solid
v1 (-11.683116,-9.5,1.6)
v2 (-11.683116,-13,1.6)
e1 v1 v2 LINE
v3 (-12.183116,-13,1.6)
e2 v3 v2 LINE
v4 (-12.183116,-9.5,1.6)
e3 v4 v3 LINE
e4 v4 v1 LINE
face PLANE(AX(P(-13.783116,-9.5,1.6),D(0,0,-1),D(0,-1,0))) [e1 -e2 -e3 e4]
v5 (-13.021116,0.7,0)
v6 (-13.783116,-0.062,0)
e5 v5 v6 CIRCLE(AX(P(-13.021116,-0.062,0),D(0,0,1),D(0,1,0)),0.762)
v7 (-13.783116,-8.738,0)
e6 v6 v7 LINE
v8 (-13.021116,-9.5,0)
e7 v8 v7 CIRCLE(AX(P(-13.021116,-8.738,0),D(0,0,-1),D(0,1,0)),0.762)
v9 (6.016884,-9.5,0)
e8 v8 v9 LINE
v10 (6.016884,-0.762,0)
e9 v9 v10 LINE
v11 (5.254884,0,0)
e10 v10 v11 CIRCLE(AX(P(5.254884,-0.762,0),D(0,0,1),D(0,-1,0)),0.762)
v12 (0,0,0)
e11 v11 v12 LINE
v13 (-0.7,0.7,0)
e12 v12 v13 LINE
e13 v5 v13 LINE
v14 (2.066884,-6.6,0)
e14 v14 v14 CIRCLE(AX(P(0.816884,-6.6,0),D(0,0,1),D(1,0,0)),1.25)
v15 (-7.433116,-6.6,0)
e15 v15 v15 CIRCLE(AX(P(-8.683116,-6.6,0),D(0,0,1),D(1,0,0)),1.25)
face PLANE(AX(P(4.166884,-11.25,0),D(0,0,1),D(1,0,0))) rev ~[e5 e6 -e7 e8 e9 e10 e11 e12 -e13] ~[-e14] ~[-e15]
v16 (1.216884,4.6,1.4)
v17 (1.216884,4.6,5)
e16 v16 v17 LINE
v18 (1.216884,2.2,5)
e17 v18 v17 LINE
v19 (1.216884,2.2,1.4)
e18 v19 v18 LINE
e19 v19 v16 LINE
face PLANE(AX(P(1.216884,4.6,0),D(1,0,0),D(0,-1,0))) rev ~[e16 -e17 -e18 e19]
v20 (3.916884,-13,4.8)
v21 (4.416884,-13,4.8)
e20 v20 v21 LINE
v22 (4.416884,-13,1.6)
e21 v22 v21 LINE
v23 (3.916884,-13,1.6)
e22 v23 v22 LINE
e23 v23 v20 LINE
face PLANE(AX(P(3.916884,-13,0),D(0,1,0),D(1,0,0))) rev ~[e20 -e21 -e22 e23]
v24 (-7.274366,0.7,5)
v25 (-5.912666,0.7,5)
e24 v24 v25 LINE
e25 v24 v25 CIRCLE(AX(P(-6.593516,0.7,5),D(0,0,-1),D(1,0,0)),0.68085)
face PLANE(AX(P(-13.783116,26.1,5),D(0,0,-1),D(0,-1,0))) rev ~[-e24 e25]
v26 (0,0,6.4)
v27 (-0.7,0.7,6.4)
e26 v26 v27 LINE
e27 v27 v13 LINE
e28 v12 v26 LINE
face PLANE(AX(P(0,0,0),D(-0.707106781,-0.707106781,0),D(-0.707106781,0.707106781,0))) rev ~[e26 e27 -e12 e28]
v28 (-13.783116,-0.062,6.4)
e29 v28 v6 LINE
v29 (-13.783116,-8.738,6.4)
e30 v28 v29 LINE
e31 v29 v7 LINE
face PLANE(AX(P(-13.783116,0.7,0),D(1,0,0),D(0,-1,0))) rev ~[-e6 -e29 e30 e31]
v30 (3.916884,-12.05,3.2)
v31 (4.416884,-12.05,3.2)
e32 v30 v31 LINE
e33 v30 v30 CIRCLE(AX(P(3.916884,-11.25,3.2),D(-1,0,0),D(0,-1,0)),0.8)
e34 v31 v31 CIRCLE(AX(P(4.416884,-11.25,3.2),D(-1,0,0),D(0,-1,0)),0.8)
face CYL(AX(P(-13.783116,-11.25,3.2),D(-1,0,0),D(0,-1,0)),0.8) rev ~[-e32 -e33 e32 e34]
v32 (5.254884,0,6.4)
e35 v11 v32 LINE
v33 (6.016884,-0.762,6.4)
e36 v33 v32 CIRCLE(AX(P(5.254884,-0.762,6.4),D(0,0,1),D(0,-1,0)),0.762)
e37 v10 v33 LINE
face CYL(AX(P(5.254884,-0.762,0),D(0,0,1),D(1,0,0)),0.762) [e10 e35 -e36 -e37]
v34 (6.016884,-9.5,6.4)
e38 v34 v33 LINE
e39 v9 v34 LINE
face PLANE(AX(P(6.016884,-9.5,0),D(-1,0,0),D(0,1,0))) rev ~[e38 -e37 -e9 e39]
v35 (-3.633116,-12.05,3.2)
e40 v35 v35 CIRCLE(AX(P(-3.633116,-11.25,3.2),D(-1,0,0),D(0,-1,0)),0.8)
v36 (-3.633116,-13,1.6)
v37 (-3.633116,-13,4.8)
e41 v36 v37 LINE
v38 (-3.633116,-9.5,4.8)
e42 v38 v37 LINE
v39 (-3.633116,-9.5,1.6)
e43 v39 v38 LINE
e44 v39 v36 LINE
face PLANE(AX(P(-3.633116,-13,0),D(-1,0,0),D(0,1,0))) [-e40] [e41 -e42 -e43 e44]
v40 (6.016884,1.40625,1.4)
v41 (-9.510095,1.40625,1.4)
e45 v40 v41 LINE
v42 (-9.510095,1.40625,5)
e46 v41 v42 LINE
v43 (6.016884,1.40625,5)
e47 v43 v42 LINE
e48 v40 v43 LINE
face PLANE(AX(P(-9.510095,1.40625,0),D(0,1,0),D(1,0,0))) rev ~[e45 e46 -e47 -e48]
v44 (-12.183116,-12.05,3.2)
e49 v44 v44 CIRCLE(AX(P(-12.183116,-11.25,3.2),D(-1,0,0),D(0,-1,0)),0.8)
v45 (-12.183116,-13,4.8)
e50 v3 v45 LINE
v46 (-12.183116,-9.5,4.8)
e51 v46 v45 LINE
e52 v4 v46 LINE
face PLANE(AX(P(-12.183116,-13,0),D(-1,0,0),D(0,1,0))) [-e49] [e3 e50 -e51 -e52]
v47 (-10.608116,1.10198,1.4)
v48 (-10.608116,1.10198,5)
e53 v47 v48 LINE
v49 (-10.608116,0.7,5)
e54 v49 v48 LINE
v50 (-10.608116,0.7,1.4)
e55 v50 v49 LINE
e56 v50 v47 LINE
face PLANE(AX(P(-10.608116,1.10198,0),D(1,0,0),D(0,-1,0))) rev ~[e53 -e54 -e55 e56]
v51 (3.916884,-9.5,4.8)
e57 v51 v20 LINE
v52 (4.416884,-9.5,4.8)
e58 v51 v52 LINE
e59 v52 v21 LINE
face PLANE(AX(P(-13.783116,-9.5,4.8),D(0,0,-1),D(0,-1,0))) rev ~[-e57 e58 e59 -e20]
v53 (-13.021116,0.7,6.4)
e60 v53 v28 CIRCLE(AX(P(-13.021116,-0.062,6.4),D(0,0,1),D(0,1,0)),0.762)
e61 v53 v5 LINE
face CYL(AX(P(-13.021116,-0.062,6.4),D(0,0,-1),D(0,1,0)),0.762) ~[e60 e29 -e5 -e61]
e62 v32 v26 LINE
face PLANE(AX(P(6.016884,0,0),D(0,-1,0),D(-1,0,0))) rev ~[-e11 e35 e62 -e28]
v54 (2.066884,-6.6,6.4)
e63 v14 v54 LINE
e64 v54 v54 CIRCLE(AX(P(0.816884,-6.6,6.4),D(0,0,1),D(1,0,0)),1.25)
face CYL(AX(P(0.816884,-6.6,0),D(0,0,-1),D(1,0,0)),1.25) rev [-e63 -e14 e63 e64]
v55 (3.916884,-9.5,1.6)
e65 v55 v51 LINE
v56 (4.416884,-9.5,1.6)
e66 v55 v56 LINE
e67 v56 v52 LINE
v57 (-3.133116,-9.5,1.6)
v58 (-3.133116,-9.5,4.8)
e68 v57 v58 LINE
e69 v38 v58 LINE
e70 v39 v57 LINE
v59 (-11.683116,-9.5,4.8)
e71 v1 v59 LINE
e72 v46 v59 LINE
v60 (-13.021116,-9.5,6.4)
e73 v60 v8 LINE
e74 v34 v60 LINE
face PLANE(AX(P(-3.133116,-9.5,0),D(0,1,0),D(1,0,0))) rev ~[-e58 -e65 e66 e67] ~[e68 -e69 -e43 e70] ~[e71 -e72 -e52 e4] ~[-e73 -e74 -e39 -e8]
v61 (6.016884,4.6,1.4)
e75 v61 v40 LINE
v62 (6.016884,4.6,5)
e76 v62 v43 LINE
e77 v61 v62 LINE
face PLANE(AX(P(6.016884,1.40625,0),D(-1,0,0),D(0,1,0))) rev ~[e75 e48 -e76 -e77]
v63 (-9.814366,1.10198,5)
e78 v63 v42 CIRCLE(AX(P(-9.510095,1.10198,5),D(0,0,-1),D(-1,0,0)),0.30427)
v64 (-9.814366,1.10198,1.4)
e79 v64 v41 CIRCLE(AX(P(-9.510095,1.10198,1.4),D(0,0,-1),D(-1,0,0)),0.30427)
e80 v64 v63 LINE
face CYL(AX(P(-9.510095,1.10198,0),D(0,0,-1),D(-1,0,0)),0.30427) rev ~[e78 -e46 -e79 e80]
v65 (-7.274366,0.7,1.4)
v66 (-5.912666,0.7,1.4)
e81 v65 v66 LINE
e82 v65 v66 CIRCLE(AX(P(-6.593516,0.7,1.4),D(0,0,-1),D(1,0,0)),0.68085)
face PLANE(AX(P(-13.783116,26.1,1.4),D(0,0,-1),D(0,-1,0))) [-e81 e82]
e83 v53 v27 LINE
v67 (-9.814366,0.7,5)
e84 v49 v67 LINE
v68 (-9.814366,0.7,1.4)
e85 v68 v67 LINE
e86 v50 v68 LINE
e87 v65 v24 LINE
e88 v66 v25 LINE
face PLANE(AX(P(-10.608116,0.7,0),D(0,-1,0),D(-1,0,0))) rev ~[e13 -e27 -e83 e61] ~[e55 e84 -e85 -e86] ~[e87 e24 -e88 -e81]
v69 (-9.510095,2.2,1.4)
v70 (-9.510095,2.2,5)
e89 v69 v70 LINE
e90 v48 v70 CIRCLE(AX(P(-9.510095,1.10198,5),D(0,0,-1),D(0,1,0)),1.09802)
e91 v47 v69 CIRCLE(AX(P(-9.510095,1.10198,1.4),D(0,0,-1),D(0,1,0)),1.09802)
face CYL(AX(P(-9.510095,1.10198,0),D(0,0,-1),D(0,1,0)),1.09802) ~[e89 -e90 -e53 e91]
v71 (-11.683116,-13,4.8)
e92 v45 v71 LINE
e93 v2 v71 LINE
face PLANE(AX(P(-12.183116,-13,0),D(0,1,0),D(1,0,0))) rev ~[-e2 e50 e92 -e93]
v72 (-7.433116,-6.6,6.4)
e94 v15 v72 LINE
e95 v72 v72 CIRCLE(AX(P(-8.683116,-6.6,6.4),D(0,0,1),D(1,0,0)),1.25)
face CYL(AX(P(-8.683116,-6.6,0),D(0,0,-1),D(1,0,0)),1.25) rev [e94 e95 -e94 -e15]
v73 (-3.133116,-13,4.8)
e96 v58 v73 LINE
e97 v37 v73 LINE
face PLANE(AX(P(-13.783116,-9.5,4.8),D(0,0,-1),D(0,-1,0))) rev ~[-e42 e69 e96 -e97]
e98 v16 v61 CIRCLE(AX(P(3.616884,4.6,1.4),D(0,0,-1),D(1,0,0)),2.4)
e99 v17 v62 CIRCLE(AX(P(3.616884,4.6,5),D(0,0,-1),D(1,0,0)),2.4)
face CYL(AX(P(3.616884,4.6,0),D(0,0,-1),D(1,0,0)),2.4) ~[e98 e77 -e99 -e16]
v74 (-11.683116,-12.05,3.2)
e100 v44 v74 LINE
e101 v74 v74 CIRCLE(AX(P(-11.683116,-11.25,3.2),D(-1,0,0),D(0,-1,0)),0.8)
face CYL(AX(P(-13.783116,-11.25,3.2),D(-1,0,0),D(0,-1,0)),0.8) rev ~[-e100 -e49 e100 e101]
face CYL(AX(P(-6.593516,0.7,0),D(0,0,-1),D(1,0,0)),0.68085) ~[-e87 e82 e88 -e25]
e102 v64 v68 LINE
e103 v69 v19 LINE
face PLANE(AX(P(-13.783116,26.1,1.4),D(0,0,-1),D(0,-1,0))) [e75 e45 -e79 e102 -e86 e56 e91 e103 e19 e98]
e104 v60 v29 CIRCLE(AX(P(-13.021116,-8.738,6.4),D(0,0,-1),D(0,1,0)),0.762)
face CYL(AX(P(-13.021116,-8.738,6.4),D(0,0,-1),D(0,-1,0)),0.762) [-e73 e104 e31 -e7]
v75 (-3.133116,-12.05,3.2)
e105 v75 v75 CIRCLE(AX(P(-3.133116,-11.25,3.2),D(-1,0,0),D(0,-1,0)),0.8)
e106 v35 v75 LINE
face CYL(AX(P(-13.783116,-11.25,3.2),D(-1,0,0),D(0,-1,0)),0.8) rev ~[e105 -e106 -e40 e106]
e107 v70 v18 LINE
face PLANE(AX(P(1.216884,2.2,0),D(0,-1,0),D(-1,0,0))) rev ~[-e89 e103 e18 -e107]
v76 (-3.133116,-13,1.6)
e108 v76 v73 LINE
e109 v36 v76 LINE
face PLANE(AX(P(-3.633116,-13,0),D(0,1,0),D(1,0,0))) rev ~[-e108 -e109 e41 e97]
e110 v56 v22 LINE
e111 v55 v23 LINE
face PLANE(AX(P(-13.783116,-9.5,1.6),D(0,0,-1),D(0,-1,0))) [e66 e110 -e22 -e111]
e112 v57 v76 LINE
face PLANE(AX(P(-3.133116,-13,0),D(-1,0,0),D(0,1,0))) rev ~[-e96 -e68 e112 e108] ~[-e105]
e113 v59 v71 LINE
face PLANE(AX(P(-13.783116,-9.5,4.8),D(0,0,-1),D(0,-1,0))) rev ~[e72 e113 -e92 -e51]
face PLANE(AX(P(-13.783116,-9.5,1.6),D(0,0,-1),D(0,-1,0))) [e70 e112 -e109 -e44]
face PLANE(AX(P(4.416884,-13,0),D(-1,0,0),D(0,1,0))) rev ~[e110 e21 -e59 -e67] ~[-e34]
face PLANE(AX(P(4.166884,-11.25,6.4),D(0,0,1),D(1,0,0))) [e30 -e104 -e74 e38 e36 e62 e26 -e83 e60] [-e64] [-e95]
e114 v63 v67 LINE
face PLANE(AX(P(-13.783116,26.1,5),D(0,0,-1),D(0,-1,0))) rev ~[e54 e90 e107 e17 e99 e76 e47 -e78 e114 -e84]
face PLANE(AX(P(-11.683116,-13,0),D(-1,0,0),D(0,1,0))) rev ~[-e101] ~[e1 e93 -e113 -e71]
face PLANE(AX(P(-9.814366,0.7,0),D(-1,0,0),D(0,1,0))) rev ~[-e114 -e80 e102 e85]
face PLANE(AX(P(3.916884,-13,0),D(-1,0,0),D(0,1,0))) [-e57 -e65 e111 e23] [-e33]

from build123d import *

# Parameters (mm, degrees)
F0_W     = 0.5
F0_H     = 3.5
F0_R     = 1.25
F1_DEPTH = 6.4
F2_W     = 25.4
F2_H     = 1.4
F2_W_2   = 3.5
F2_H_2   = 1.6
F2_R     = 0.8
F3_DEPTH = 19.8
F4_R     = 0.762


with BuildPart() as f1:
    # F0 (on Top) → F1 (new body)
    with BuildSketch(Plane.XY):
        with Locations((4.1668843009, -11.25)):
            Rectangle(F0_W, F0_H)
        with Locations((-3.3831156991, -11.25)):
            Rectangle(F0_W, F0_H)
        with Locations((-11.9331156991, -11.25)):
            Rectangle(F0_W, F0_H)
        with BuildLine():
            Line((-10.6081156991, 0.7), (-9.8143656991, 0.7))
            Line((-9.8143656991, 0.7), (-9.8143656991, 1.101979753))
            ThreePointArc((-9.8143656991, 1.101979753), (-9.7252470071, 1.317131308), (-9.5100954521, 1.40625))
            Line((-9.5100954521, 1.40625), (6.0168843009, 1.40625))
            Line((6.0168843009, 1.40625), (6.0168843009, 2.2))
            Line((6.0168843009, 2.2), (6.0168843009, 4.6))
            ThreePointArc((6.0168843009, 4.6), (3.6168843009, 7), (1.2168843009, 4.6))
            Line((1.2168843009, 4.6), (1.2168843009, 2.2))
            Line((1.2168843009, 2.2), (-9.5100954521, 2.2))
            ThreePointArc((-9.5100954521, 2.2), (-10.2865130147, 1.8783973155), (-10.6081156991, 1.101979753))
            Line((-10.6081156991, 1.101979753), (-10.6081156991, 0.7))
        make_face()
        with BuildLine():
            Line((6.0168843009, 0), (0, 0))
            Line((0, 0), (-0.7, 0.7))
            Line((-0.7, 0.7), (-5.9126656991, 0.7))
            ThreePointArc((-5.9126656991, 0.7), (-6.5935156991, 1.38085), (-7.2743656991, 0.7))
            Line((-7.2743656991, 0.7), (-9.8143656991, 0.7))
            Line((-9.8143656991, 0.7), (-10.6081156991, 0.7))
            Line((-10.6081156991, 0.7), (-13.7831156991, 0.7))
            Line((-13.7831156991, 0.7), (-13.7831156991, -9.5))
            Line((-13.7831156991, -9.5), (-12.1831156991, -9.5))
            Line((-12.1831156991, -9.5), (-11.6831156991, -9.5))
            Line((-11.6831156991, -9.5), (-3.6331156991, -9.5))
            Line((-3.6331156991, -9.5), (-3.1331156991, -9.5))
            Line((-3.1331156991, -9.5), (3.9168843009, -9.5))
            Line((3.9168843009, -9.5), (4.4168843009, -9.5))
            Line((4.4168843009, -9.5), (6.0168843009, -9.5))
            Line((6.0168843009, -9.5), (6.0168843009, 0))
        make_face()
        with Locations((-8.6831156991, -6.6)):
            Circle(F0_R, mode=Mode.SUBTRACT)
        with Locations((0.8168843009, -6.6)):
            Circle(F0_R, mode=Mode.SUBTRACT)
    extrude(amount=F1_DEPTH)

    # F2 (on face) → F3 (cut, through all)
    with BuildSketch(Plane(origin=(-13.7831156991, 0, 0), x_dir=(0, -1, 0), z_dir=(-1, 0, 0))):
        with Locations((-13.4, 0.7)):
            Rectangle(F2_W, F2_H)
        with Locations((-13.4, 5.7)):
            Rectangle(F2_W, F2_H)
        with Locations((11.25, 0.8)):
            Rectangle(F2_W_2, F2_H_2)
        with Locations((11.25, 5.6)):
            Rectangle(F2_W_2, F2_H_2)
        with Locations((11.25, 3.2)):
            Circle(F2_R)
    extrude(amount=-F3_DEPTH, mode=Mode.SUBTRACT)

    # F4
    f4_edges = [f1.edges().sort_by_distance(p)[0] for p in [
        (-13.783116, -9.5, 3.2),
        (6.016884, 0, 3.2),
        (-13.783116, 0.7, 3.2),
    ]]
    fillet(f4_edges, radius=F4_R)


solid = f1.part
